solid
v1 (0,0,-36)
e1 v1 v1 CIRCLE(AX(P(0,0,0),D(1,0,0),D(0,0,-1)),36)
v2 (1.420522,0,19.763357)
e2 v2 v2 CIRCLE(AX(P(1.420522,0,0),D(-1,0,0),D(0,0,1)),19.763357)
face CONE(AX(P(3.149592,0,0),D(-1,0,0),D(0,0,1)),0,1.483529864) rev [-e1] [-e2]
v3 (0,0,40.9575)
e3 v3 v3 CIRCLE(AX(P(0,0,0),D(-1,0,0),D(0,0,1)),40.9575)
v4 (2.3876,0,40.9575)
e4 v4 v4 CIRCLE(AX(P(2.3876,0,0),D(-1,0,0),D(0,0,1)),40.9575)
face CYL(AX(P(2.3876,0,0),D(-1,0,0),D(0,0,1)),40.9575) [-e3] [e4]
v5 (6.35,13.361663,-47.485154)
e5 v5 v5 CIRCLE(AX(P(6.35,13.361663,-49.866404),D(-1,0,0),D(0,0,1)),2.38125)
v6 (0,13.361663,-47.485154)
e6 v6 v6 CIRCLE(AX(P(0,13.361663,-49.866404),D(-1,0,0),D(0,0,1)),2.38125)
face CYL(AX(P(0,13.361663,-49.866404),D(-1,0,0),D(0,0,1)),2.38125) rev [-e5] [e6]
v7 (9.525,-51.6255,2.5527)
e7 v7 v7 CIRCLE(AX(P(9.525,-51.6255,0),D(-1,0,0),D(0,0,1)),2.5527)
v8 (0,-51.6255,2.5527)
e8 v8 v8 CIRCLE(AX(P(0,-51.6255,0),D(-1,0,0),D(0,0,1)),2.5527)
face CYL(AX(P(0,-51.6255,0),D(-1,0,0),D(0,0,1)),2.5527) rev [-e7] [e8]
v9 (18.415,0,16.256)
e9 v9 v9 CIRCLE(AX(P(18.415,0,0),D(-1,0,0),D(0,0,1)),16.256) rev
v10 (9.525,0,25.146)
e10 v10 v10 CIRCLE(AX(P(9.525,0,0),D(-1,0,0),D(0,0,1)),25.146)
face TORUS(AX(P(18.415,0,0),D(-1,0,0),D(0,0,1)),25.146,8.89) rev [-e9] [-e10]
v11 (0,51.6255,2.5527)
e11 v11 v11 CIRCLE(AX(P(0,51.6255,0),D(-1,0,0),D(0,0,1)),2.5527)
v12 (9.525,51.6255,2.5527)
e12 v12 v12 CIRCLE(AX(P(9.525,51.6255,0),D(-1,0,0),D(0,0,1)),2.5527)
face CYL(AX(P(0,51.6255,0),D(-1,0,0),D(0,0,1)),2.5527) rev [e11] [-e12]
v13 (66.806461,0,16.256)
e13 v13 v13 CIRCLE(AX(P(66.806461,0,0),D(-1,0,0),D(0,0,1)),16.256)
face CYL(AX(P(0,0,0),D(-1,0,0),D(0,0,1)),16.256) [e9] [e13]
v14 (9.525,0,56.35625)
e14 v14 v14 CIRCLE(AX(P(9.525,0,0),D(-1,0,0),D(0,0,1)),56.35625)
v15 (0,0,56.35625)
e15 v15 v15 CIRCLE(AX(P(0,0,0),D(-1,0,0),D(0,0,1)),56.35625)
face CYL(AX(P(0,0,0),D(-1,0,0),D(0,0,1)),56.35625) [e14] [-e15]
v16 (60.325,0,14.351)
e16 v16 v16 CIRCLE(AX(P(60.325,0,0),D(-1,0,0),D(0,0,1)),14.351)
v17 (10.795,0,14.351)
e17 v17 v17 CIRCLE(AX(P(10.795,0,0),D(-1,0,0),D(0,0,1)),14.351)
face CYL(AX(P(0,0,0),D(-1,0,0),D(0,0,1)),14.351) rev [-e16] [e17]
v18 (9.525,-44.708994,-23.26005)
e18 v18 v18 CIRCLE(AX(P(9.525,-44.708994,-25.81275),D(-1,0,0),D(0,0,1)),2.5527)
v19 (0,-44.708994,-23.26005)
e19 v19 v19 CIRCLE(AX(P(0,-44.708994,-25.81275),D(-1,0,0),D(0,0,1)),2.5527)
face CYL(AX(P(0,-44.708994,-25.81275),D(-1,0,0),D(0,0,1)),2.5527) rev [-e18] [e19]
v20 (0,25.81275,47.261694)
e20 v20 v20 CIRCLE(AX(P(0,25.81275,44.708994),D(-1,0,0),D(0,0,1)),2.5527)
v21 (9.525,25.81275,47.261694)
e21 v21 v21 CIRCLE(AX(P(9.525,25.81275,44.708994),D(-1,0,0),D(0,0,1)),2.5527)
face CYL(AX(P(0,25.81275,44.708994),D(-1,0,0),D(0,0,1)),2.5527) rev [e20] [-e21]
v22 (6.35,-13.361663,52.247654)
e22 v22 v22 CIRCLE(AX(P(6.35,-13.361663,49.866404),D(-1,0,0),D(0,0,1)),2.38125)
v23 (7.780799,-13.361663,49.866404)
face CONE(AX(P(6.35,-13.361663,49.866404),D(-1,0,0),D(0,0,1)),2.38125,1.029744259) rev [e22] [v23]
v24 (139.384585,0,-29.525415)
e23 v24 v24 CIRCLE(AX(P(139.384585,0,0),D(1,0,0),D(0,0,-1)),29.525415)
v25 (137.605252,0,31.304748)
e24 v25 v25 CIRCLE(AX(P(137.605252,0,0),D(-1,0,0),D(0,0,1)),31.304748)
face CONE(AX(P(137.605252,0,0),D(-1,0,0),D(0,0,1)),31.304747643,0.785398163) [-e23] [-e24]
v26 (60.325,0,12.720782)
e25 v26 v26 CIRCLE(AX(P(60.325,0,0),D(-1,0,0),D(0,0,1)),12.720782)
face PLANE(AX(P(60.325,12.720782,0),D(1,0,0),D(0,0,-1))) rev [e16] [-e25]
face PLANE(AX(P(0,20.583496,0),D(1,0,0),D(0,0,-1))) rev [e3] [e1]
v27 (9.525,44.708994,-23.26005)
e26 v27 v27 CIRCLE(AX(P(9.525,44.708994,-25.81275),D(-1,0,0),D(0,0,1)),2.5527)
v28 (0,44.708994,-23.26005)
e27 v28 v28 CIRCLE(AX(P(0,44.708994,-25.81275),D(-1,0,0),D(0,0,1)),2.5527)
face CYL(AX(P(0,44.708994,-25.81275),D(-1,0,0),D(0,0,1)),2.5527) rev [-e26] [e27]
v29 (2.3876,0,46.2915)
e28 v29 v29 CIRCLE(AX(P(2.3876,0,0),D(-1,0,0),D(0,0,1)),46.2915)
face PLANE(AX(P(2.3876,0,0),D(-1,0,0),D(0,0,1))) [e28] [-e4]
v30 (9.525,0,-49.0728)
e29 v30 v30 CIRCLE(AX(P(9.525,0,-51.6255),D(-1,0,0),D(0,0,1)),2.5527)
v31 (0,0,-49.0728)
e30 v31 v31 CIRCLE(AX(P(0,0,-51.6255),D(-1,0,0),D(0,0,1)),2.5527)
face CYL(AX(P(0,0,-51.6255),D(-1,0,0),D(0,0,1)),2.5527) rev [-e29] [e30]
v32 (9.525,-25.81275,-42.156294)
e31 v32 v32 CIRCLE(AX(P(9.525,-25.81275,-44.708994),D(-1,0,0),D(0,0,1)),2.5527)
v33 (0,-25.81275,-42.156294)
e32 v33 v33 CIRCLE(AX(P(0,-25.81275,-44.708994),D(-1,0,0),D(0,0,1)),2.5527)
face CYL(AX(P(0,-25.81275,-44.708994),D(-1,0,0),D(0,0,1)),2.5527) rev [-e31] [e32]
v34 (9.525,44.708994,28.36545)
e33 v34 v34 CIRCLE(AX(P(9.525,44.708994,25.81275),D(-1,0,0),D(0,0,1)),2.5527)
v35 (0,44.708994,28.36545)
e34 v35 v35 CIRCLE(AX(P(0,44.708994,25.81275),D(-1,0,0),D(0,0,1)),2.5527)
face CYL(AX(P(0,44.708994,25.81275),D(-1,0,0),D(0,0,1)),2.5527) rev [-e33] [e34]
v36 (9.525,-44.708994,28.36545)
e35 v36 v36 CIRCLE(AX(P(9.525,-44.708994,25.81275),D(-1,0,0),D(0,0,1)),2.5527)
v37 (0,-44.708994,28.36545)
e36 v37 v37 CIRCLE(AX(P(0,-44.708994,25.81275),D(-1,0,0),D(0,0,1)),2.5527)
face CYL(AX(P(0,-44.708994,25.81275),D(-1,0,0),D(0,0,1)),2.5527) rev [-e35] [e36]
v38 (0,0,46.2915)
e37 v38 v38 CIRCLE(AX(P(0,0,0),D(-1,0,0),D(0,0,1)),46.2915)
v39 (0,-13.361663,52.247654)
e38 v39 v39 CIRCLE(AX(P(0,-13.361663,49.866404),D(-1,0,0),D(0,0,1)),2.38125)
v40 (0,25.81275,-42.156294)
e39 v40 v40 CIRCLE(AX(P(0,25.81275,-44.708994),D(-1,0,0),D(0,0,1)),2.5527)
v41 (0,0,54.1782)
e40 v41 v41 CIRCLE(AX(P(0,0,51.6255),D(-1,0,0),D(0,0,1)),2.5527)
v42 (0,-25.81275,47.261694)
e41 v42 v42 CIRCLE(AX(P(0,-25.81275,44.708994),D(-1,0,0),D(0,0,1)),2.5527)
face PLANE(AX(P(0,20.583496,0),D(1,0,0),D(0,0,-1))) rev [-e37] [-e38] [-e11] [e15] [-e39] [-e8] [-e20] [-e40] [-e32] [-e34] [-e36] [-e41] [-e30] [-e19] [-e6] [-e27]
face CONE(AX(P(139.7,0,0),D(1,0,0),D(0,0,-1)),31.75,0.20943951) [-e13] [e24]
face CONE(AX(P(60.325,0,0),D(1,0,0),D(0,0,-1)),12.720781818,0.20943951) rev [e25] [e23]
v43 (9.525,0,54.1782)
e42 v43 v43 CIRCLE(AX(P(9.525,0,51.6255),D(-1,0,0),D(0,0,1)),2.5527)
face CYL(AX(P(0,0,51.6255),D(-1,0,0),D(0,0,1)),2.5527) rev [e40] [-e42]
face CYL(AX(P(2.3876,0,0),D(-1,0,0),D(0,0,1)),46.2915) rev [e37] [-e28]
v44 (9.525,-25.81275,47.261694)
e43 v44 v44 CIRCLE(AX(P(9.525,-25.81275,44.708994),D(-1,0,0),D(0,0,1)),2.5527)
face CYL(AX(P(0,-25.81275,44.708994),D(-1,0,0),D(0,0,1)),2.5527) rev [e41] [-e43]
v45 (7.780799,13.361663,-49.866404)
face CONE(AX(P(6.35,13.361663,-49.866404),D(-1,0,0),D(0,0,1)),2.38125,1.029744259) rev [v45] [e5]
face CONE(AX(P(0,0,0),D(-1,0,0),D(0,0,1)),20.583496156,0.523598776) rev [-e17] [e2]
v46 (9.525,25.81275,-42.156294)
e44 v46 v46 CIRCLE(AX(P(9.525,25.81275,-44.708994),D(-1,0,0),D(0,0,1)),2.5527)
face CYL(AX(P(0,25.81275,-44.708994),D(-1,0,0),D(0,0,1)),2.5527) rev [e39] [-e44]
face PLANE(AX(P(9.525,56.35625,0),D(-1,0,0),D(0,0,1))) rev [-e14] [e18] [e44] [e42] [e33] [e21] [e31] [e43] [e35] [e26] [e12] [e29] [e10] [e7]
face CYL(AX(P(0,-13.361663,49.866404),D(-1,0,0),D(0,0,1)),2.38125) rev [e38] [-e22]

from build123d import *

# Parameters (mm, degrees)
FLANGE_HOLES_D     = 5.1054
DOWEL_HOLES_D      = 4.7625
DOWEL_HOLES_DEPTH  = 6.35
DOWEL_HOLES_TIP    = 1.430799349
FILLET1_R          = 8.89
CHAMFER1_SIZE      = 2.141545552
CHAMFER1_SIZE_2    = 2.54
SKETCH14_R         = 46.2915
SKETCH14_R_2       = 40.9575
CUT_EXTRUDE1_DEPTH = 2.3876


with BuildPart() as part:
    # Sketch2 → Main Structure (revolve)
    with BuildSketch(Plane.XY, mode=Mode.PRIVATE) as main_structure_sk:
        Polygon((0, 20.583496156), (0, 56.35625), (9.525, 56.35625), (9.525, 16.256), (66.806461084, 16.256), (139.7, 31.75), (139.7, 29.592458901), (60.325, 12.720781818), (60.325, 14.351), (10.795, 14.351), align=None)
    revolve(main_structure_sk.sketch.rotate(Axis((0, 0, 0), (1, 0, 0)), 90), axis=Axis((0, 0, 0), (1, 0, 0)))

    # Flange Holes (through all)
    with Locations(Plane.ZY):
        with Locations((0, -51.6255), (-25.81275, -44.708994483), (-44.708994483, -25.81275), (-51.6255, 0), (-44.708994483, 25.81275), (-25.81275, 44.708994483), (0, 51.6255), (25.81275, 44.708994483), (44.708994483, 25.81275), (51.6255, 0), (44.708994483, -25.81275), (25.81275, -44.708994483)):
            Hole(FLANGE_HOLES_D / 2)

    # Dowel Holes
    with Locations(Plane.ZY):
        with Locations((49.866403745, -13.361662613), (-49.866403745, 13.361662613)):
            Hole(DOWEL_HOLES_D / 2, depth=DOWEL_HOLES_DEPTH)
            with Locations((0, 0, -(DOWEL_HOLES_DEPTH + DOWEL_HOLES_TIP / 2))):  # 118° drill point
                Cone(0, DOWEL_HOLES_D / 2, DOWEL_HOLES_TIP, mode=Mode.SUBTRACT)

    # Fillet1
    fillet1_edges = [part.edges().sort_by_distance(p)[0] for p in [
        (9.525, 0, -16.256),
    ]]
    fillet(fillet1_edges, radius=FILLET1_R)

    # Sketch13 → Cut-Revolve1 (revolve, cut)
    with BuildSketch(Plane(origin=(0, 0, 0), x_dir=(1, 0, 0), z_dir=(0, 1, 0)), mode=Mode.PRIVATE) as cut_revolve1_sk:
        Polygon((0, 36), (3.149591887, 0), (0, 0), align=None)
    revolve(cut_revolve1_sk.sketch.rotate(Axis((3.149591887, 0, 0), (-1, 0, 0)), 180), axis=Axis((3.149591887, 0, 0), (-1, 0, 0)), mode=Mode.SUBTRACT)

    # Chamfer1
    # the kernel refuses this chamfer: 2.54, 2.141545552 mm, written as the material it takes off along each edge
    with BuildSketch(Plane(origin=(139.7, 0, 0), x_dir=(0, 0, 1), z_dir=(0, 1, 0))) as chamfer1_piece_1:
        Polygon((31.75 - CHAMFER1_SIZE * 0.207911690799, -CHAMFER1_SIZE * 0.978147600645), (31.75 - CHAMFER1_SIZE_2, 0), (31.75, 0), align=None)
    revolve(axis=Axis((139.7, 0, 0), (1, 0, 0)), mode=Mode.SUBTRACT)

    # Sketch14 → Cut-Extrude1 (cut)
    with BuildSketch(Plane.ZY):
        Circle(SKETCH14_R)
        Circle(SKETCH14_R_2, mode=Mode.SUBTRACT)
    extrude(amount=-CUT_EXTRUDE1_DEPTH, mode=Mode.SUBTRACT)


solid = part.part
